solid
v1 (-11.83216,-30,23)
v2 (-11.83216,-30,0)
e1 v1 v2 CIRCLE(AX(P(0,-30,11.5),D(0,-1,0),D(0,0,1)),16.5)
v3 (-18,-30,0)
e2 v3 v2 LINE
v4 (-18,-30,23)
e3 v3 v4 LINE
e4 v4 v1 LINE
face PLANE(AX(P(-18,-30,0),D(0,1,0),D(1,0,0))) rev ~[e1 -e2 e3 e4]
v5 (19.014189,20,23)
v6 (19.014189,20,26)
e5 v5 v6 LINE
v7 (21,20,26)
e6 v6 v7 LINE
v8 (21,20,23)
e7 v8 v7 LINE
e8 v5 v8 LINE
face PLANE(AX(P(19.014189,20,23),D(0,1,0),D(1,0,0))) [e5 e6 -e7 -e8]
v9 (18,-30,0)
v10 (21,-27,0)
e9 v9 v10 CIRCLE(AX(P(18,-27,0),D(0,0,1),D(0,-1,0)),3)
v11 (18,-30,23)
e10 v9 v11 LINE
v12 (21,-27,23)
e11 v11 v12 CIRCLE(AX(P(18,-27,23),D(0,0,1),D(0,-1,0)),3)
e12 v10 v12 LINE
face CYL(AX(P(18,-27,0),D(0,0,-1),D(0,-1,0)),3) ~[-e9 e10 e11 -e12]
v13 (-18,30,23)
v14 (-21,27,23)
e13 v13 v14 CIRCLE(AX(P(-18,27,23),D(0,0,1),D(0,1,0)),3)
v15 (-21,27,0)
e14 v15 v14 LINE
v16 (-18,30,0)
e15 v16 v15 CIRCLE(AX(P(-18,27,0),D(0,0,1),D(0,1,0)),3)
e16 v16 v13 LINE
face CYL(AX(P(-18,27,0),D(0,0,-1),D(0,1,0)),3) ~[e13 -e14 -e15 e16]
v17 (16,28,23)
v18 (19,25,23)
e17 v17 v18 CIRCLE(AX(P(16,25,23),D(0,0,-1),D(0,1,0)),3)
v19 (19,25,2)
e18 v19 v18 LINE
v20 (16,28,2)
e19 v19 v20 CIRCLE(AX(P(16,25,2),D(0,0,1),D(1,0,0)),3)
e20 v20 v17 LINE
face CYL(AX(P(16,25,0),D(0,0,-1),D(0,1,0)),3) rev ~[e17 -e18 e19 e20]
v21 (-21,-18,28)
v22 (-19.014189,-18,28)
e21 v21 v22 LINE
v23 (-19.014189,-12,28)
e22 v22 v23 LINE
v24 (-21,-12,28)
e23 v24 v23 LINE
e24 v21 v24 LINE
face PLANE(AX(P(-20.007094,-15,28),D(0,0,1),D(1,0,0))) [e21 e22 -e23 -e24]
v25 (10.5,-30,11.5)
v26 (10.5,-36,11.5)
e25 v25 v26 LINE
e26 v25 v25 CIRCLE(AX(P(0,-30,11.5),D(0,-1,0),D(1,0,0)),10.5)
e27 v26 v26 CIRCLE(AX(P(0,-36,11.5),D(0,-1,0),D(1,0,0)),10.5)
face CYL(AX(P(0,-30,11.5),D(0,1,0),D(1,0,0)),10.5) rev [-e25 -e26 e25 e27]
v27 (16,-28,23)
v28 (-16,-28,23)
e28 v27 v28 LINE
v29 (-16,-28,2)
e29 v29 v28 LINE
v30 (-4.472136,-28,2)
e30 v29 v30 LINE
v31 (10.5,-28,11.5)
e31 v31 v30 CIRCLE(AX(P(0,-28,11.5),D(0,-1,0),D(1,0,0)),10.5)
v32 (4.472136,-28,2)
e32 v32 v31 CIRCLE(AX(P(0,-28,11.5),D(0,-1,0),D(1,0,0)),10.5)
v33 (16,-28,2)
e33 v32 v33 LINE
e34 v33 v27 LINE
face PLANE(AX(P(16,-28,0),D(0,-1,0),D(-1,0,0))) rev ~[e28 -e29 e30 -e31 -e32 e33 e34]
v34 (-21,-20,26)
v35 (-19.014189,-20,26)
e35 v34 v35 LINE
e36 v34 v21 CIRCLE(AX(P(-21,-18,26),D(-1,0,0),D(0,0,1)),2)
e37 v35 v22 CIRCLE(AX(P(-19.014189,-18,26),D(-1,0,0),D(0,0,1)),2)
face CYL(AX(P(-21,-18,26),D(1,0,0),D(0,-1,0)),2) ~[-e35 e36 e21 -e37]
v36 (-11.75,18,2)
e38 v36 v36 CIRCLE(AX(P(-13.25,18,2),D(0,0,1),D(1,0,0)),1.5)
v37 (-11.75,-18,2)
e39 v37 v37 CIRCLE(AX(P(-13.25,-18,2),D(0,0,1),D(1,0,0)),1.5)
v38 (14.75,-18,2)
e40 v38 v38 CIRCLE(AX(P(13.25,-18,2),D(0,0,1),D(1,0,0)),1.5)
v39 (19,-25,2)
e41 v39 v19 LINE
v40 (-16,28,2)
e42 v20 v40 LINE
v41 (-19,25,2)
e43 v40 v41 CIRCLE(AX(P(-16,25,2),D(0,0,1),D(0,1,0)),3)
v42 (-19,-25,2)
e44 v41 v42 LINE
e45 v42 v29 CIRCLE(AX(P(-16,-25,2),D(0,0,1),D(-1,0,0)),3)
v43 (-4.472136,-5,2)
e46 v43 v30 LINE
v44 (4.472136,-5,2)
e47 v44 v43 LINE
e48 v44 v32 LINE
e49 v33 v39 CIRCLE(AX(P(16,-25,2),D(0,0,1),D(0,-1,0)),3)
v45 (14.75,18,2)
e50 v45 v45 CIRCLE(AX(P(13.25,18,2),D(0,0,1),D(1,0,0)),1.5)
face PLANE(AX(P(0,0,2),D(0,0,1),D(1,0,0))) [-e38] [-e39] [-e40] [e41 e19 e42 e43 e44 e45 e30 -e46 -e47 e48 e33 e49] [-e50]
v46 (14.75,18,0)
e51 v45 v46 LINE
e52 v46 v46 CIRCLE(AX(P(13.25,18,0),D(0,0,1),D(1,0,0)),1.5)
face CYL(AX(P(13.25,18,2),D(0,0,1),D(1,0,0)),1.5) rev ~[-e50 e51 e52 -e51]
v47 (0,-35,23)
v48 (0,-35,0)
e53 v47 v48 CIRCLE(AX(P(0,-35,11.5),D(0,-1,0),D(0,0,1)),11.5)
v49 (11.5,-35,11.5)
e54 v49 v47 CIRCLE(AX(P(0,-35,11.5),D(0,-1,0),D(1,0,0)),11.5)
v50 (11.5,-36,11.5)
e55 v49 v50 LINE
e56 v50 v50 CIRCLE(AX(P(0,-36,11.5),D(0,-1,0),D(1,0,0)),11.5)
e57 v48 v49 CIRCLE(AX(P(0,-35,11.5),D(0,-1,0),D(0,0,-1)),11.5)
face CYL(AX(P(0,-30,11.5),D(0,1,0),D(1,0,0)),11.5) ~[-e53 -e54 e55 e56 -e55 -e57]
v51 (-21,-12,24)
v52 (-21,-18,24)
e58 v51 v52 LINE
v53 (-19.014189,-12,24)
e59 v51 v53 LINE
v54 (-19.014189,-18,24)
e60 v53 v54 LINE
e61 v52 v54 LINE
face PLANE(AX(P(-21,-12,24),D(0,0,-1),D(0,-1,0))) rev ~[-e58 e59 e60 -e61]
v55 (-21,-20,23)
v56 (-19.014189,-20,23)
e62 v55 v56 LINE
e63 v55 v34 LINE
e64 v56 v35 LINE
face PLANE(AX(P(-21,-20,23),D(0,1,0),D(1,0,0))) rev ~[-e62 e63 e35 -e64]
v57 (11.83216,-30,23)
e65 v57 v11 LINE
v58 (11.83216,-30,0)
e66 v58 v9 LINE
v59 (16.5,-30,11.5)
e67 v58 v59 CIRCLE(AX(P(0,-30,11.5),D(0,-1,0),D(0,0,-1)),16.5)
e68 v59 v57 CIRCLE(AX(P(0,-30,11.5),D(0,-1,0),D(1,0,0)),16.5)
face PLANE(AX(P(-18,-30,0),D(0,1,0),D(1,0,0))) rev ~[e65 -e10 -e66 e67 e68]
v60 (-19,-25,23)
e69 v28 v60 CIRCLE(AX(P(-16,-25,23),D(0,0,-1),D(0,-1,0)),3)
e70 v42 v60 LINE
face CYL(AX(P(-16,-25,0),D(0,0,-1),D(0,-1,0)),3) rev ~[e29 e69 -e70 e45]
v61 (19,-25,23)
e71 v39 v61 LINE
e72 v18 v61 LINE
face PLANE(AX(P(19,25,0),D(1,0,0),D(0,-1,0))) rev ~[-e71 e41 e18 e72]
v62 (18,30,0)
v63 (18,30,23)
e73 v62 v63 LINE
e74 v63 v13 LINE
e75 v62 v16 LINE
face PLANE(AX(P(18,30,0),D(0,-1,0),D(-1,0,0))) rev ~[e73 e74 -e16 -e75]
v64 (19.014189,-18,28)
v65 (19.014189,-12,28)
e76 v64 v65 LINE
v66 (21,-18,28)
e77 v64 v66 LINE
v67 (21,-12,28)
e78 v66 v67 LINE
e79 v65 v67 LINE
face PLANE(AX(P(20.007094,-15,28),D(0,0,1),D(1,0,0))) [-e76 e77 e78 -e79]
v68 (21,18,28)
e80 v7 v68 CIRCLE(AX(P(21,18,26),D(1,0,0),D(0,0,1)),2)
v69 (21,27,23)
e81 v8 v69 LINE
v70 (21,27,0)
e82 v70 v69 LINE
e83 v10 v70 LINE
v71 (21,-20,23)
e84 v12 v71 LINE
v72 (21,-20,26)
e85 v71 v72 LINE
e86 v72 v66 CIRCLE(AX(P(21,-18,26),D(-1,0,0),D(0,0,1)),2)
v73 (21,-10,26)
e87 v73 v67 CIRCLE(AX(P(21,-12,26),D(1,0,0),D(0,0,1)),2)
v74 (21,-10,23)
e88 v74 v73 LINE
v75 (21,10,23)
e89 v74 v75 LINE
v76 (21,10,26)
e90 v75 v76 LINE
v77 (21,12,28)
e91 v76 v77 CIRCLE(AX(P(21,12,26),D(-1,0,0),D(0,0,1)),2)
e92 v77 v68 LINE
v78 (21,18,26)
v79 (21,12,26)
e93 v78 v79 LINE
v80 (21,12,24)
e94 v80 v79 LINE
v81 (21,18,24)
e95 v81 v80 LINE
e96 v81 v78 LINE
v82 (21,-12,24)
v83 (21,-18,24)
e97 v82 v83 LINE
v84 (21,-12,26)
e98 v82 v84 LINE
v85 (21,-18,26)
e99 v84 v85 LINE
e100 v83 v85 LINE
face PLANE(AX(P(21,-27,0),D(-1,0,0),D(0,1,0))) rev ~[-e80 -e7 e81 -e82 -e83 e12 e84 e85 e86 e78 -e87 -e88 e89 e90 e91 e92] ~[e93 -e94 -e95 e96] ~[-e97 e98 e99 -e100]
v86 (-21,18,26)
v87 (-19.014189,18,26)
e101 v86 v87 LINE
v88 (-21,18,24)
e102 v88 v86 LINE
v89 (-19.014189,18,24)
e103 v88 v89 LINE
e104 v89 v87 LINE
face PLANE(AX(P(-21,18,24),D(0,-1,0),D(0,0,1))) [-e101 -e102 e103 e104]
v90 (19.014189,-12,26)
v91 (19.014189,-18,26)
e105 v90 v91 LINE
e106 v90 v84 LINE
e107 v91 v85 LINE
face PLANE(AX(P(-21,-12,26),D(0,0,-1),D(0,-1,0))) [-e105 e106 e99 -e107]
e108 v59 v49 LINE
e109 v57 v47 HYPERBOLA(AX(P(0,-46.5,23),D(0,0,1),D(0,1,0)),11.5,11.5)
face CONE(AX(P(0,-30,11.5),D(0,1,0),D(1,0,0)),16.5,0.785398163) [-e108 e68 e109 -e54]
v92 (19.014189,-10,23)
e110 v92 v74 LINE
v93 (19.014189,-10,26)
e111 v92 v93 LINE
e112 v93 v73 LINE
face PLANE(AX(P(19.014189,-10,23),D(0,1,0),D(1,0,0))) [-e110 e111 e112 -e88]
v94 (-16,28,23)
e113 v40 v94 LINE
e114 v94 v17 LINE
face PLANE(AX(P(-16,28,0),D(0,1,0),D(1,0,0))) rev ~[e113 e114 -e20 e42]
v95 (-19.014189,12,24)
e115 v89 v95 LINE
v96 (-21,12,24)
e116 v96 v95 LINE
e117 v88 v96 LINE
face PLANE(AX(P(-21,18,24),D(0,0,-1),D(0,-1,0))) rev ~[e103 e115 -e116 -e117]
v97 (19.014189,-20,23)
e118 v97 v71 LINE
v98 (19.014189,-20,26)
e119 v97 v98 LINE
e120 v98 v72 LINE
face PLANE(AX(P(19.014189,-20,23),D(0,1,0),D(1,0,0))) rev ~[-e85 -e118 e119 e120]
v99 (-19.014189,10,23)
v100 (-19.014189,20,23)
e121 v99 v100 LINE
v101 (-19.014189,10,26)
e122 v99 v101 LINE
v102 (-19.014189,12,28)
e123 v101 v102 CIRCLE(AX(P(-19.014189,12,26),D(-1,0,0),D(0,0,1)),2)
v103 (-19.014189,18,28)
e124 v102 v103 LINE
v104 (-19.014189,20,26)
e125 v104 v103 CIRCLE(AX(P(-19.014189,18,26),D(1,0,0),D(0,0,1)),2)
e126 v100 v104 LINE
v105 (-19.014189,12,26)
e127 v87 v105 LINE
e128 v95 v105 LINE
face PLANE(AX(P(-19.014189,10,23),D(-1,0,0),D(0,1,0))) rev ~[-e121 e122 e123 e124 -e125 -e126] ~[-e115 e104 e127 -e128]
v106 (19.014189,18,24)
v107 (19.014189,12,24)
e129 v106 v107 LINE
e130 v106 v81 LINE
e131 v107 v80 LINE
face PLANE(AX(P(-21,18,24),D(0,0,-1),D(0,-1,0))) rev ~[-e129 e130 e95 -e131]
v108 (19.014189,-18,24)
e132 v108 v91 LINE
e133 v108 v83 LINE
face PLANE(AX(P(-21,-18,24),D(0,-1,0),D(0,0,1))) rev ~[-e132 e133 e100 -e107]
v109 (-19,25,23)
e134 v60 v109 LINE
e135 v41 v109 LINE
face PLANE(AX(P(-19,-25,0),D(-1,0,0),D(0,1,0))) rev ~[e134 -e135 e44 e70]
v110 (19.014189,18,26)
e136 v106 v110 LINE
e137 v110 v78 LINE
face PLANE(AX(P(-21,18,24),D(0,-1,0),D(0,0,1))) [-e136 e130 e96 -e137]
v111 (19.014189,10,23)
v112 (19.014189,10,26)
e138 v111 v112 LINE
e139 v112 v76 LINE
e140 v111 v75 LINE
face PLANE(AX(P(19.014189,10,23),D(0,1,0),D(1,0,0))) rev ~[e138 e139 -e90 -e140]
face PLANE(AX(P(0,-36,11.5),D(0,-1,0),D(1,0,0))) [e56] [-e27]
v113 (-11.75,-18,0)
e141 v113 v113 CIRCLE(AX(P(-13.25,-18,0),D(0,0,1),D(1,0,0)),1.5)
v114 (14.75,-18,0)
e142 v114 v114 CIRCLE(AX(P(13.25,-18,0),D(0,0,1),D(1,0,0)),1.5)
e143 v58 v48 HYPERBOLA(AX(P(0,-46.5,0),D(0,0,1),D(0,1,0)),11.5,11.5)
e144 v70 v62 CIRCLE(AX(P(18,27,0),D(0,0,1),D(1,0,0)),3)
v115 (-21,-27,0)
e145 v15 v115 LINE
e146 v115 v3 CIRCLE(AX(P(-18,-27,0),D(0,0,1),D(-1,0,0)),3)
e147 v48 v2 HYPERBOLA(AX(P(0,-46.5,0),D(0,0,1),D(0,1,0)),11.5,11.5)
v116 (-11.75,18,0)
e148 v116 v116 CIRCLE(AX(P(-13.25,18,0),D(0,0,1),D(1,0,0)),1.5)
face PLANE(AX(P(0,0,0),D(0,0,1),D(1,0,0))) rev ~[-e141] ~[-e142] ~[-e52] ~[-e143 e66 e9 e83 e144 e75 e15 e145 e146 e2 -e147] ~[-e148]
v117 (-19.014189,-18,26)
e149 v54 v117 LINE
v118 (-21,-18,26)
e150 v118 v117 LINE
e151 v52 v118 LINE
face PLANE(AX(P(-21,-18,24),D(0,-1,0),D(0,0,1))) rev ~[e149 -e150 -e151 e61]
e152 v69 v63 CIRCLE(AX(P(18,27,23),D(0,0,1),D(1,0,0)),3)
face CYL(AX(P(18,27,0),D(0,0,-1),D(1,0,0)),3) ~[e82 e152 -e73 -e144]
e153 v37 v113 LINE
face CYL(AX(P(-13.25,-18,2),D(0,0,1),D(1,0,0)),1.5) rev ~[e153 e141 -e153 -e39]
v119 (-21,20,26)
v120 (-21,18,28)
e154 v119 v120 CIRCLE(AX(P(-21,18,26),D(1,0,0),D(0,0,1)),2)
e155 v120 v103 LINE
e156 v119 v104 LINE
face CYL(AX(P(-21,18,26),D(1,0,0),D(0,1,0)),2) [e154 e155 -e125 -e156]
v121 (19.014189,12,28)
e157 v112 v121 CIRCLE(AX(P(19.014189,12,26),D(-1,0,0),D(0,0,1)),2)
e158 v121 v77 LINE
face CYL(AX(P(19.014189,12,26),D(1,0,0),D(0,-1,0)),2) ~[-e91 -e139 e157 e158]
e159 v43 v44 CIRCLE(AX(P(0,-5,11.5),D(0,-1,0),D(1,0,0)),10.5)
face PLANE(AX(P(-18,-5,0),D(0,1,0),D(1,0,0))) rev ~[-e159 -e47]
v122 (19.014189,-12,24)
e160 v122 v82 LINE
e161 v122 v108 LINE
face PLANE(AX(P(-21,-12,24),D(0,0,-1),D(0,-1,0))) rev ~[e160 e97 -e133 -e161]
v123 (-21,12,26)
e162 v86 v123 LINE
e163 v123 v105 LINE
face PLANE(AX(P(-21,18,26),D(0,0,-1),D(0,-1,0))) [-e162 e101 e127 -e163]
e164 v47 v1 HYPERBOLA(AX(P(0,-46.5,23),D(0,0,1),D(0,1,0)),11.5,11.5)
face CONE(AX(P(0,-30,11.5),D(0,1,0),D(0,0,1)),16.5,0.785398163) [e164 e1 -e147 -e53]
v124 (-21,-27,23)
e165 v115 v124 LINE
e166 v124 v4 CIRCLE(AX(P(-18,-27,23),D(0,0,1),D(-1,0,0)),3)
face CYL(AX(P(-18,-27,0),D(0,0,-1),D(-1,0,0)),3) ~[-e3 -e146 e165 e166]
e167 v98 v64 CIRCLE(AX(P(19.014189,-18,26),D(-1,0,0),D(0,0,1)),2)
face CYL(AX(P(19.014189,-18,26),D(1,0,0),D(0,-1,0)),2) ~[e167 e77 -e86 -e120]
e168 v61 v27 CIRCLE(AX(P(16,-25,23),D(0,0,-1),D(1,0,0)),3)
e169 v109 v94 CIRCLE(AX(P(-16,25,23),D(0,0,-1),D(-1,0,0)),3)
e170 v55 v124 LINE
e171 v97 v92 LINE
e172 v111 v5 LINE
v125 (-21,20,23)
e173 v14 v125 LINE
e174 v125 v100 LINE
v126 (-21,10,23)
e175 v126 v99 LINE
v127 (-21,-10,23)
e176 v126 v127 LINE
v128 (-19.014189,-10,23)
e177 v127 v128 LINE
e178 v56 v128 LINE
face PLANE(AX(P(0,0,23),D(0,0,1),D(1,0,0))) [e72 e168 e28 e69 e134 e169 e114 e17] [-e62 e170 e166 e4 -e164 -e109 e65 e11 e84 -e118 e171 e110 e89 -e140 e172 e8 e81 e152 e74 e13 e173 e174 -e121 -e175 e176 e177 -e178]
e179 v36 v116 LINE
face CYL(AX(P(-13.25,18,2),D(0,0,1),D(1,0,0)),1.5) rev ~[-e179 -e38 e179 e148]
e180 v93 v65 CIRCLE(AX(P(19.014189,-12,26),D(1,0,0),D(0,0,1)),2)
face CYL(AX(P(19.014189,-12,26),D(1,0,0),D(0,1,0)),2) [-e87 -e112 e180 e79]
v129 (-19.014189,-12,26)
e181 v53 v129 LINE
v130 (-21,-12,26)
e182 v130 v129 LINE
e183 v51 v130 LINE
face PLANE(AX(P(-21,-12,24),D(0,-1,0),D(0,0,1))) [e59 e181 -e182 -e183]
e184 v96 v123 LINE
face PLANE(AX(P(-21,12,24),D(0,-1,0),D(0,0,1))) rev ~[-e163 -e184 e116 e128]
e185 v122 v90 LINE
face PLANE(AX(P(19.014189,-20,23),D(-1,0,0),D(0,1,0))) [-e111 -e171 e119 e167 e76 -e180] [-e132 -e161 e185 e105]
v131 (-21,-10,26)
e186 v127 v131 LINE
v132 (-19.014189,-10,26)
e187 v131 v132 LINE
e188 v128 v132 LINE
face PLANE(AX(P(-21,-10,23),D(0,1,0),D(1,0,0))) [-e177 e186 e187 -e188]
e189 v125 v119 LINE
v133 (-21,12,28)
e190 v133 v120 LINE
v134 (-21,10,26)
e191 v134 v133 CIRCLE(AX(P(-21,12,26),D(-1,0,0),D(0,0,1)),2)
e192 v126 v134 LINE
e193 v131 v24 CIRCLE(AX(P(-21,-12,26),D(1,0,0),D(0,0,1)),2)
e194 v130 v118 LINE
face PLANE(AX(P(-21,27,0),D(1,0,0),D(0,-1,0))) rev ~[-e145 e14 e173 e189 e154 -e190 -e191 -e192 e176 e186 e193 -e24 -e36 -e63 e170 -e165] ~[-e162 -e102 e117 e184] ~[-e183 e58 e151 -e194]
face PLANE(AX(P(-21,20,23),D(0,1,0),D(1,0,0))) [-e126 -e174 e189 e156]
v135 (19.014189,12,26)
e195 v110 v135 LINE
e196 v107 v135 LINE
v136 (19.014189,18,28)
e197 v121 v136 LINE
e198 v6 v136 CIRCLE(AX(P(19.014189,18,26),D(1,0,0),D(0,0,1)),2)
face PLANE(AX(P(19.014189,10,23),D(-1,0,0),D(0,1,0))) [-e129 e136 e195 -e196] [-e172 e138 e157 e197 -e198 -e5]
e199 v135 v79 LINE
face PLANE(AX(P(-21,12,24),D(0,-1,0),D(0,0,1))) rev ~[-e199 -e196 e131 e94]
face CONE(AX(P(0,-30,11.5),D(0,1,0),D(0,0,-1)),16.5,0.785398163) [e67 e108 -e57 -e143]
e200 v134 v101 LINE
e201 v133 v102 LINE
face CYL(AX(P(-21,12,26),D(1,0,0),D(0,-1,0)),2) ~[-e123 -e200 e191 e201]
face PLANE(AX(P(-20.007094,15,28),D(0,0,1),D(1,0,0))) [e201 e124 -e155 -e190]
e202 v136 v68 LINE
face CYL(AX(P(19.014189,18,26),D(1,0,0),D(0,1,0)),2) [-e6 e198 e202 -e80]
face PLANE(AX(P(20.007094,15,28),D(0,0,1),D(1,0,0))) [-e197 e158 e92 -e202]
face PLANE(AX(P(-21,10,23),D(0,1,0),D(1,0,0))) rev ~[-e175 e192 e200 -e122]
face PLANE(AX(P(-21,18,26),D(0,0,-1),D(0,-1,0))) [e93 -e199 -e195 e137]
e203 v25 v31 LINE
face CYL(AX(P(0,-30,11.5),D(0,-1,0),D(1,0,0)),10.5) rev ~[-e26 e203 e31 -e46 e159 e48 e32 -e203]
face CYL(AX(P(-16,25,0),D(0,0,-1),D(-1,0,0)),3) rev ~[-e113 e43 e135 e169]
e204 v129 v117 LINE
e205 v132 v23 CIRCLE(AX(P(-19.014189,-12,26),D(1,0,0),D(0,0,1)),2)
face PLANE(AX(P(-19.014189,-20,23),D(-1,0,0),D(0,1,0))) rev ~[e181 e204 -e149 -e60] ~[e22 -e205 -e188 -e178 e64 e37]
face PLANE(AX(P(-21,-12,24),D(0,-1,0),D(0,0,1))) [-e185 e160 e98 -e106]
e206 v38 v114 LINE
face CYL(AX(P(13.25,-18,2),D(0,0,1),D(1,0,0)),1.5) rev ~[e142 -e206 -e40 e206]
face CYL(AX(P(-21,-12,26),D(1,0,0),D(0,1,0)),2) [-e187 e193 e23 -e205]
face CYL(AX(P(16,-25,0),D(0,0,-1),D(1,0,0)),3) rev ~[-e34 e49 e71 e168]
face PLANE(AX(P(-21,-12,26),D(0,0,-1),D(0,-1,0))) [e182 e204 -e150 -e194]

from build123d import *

# Parameters (mm, degrees)
F4_DEPTH     = 23
F5_DEPTH     = 2
F6_R         = 11.5
F6_R_2       = 10.5
F7_DEPTH     = 6
F8_DEPTH     = 25
F9_T4_ANGLE  = 179.9999999711
F9_T10_ANGLE = 89.9999998967
F9_T15_ANGLE = 90.0000001322
F10_R        = 1.5
F11_DEPTH    = 2.001
F12_W        = 1.9858112633
F12_H        = 10
F13_DEPTH    = 5
F14_R        = 2
F15_W        = 6
F15_H        = 2
F16_DEPTH    = 42.001


# Not quite as in the source:
# - a fillet or chamfer that OpenCascade refuses, or shapes differently, is made with other operations: its cross-section is extruded or revolved along the edge and cut away or added


with BuildPart() as f4:
    # F3 (on Top) → F4 (new body)
    with BuildSketch(Plane.XY):
        with BuildLine():
            Line((18, 30), (-18, 30))
            ThreePointArc((-18, 30), (-20.1213203436, 29.1213203436), (-21, 27))
            Line((-21, 27), (-21, -27))
            ThreePointArc((-21, -27), (-20.1213203436, -29.1213203436), (-18, -30))
            Line((-18, -30), (18, -30))
            ThreePointArc((18, -30), (20.1213203436, -29.1213203436), (21, -27))
            Line((21, -27), (21, 27))
            ThreePointArc((21, 27), (20.1213203436, 29.1213203436), (18, 30))
        make_face()
        with BuildLine():
            ThreePointArc((-19, 25), (-18.1213203436, 27.1213203436), (-16, 28))
            Line((-16, 28), (16, 28))
            ThreePointArc((16, 28), (18.1213203436, 27.1213203436), (19, 25))
            Line((19, 25), (19, -25))
            ThreePointArc((19, -25), (18.1213203436, -27.1213203436), (16, -28))
            Line((16, -28), (-16, -28))
            ThreePointArc((-16, -28), (-18.1213203436, -27.1213203436), (-19, -25))
            Line((-19, -25), (-19, 25))
        make_face(mode=Mode.SUBTRACT)
    extrude(amount=F4_DEPTH)

    # F3 (on Top) → F5 (join)
    with BuildSketch(Plane.XY):
        with BuildLine():
            Line((16, 28), (-16, 28))
            ThreePointArc((-16, 28), (-18.1213203436, 27.1213203436), (-19, 25))
            Line((-19, 25), (-19, -25))
            ThreePointArc((-19, -25), (-18.1213203436, -27.1213203436), (-16, -28))
            Line((-16, -28), (16, -28))
            ThreePointArc((16, -28), (18.1213203436, -27.1213203436), (19, -25))
            Line((19, -25), (19, 25))
            ThreePointArc((19, 25), (18.1213203436, 27.1213203436), (16, 28))
        make_face()
    extrude(amount=F5_DEPTH)

    # F6 (on face) → F7 (join)
    with BuildSketch(Plane.XZ.offset(30)):
        with Locations((0, 11.5)):
            Circle(F6_R)
        with Locations((0, 11.5)):
            Circle(F6_R_2, mode=Mode.SUBTRACT)
    extrude(amount=F7_DEPTH)

    # F8 (cut): a face of the model
    f8_faces = [f4.faces().sort_by_distance(p)[0] for p in [
        (0, -30, 11.5),
    ]]
    extrude(f8_faces, amount=-F8_DEPTH, mode=Mode.SUBTRACT)

    # F9: chamfer of 5 on 1 edges, made by hand


with BuildPart() as f9_tool2:
    # F9_s3 → F9_t4 (revolve)
    with BuildSketch(Plane.YZ):
        Polygon((-30, 28), (-35, 23), (-30, 23), align=None)
    revolve(axis=Axis((0, -30, 11.5), (0, -1, 0)), revolution_arc=F9_T4_ANGLE)

    split(bisect_by=Plane.XY, keep=Keep.TOP)

    split(bisect_by=Plane.XY.offset(23), keep=Keep.BOTTOM)


with BuildPart() as f4_1:
    add(f4.part)

    # F9_t1: union F9_tool2
    add(f9_tool2.part)


with BuildPart() as f9_tool8:
    # F9_s9 → F9_t10 (revolve)
    with BuildSketch(Plane.XY.offset(11.5)):
        Polygon((16.5, -30), (11.5, -35), (11.5, -30), align=None)
    revolve(axis=Axis((0, -30, 11.5), (0, -1, 0)), revolution_arc=F9_T10_ANGLE)

    split(bisect_by=Plane.XY.offset(23), keep=Keep.BOTTOM)


with BuildPart() as f4_2:
    add(f4_1.part)

    # F9_t7: union F9_tool8
    add(f9_tool8.part)


with BuildPart() as f9_tool13:
    # F9_s14 → F9_t15 (revolve)
    with BuildSketch(Plane.YZ):
        Polygon((-30, -5), (-35, 0), (-30, 0), align=None)
    revolve(axis=Axis((0, -30, 11.5), (0, -1, 0)), revolution_arc=F9_T15_ANGLE)

    split(bisect_by=Plane.XY, keep=Keep.TOP)


with BuildPart() as f4_3:
    add(f4_2.part)

    # F9_t12: union F9_tool13
    add(f9_tool13.part)

    # F10 (on face) → F11 (cut, through all)
    with BuildSketch(Plane.XY.offset(2)):
        with Locations((-13.25, 18)):
            Circle(F10_R)
        with Locations((-13.25, -18)):
            Circle(F10_R)
        with Locations((13.25, 18)):
            Circle(F10_R)
        with Locations((13.25, -18)):
            Circle(F10_R)
    extrude(amount=-F11_DEPTH, mode=Mode.SUBTRACT)

    # F12 (on face) → F13 (join)
    with BuildSketch(Plane.XY.offset(23)):
        with Locations((-20.0070943683, 15)):
            Rectangle(F12_W, F12_H)
        with Locations((-20.0070943683, -15)):
            Rectangle(F12_W, F12_H)
        with Locations((20.0070943683, 15)):
            Rectangle(F12_W, F12_H)
        with Locations((20.0070943683, -15)):
            Rectangle(F12_W, F12_H)
    extrude(amount=F13_DEPTH)

    # F14
    f14_edges = [f4_3.edges().sort_by_distance(p)[0] for p in [
        (-20.007094, -20, 28),
        (-20.007094, -10, 28),
        (-20.007094, 10, 28),
        (-20.007094, 20, 28),
        (20.007094, 20, 28),
        (20.007094, 10, 28),
        (20.007094, -10, 28),
        (20.007094, -20, 28),
    ]]
    fillet(f14_edges, radius=F14_R)

    # F15 (on face) → F16 (cut, through all)
    with BuildSketch(Plane(origin=(-21, 0, 0), x_dir=(0, -1, 0), z_dir=(-1, 0, 0))):
        with Locations((-15, 25)):
            Rectangle(F15_W, F15_H)
        with Locations((15, 25)):
            Rectangle(F15_W, F15_H)
    extrude(amount=-F16_DEPTH, mode=Mode.SUBTRACT)


solid = f4_3.part
